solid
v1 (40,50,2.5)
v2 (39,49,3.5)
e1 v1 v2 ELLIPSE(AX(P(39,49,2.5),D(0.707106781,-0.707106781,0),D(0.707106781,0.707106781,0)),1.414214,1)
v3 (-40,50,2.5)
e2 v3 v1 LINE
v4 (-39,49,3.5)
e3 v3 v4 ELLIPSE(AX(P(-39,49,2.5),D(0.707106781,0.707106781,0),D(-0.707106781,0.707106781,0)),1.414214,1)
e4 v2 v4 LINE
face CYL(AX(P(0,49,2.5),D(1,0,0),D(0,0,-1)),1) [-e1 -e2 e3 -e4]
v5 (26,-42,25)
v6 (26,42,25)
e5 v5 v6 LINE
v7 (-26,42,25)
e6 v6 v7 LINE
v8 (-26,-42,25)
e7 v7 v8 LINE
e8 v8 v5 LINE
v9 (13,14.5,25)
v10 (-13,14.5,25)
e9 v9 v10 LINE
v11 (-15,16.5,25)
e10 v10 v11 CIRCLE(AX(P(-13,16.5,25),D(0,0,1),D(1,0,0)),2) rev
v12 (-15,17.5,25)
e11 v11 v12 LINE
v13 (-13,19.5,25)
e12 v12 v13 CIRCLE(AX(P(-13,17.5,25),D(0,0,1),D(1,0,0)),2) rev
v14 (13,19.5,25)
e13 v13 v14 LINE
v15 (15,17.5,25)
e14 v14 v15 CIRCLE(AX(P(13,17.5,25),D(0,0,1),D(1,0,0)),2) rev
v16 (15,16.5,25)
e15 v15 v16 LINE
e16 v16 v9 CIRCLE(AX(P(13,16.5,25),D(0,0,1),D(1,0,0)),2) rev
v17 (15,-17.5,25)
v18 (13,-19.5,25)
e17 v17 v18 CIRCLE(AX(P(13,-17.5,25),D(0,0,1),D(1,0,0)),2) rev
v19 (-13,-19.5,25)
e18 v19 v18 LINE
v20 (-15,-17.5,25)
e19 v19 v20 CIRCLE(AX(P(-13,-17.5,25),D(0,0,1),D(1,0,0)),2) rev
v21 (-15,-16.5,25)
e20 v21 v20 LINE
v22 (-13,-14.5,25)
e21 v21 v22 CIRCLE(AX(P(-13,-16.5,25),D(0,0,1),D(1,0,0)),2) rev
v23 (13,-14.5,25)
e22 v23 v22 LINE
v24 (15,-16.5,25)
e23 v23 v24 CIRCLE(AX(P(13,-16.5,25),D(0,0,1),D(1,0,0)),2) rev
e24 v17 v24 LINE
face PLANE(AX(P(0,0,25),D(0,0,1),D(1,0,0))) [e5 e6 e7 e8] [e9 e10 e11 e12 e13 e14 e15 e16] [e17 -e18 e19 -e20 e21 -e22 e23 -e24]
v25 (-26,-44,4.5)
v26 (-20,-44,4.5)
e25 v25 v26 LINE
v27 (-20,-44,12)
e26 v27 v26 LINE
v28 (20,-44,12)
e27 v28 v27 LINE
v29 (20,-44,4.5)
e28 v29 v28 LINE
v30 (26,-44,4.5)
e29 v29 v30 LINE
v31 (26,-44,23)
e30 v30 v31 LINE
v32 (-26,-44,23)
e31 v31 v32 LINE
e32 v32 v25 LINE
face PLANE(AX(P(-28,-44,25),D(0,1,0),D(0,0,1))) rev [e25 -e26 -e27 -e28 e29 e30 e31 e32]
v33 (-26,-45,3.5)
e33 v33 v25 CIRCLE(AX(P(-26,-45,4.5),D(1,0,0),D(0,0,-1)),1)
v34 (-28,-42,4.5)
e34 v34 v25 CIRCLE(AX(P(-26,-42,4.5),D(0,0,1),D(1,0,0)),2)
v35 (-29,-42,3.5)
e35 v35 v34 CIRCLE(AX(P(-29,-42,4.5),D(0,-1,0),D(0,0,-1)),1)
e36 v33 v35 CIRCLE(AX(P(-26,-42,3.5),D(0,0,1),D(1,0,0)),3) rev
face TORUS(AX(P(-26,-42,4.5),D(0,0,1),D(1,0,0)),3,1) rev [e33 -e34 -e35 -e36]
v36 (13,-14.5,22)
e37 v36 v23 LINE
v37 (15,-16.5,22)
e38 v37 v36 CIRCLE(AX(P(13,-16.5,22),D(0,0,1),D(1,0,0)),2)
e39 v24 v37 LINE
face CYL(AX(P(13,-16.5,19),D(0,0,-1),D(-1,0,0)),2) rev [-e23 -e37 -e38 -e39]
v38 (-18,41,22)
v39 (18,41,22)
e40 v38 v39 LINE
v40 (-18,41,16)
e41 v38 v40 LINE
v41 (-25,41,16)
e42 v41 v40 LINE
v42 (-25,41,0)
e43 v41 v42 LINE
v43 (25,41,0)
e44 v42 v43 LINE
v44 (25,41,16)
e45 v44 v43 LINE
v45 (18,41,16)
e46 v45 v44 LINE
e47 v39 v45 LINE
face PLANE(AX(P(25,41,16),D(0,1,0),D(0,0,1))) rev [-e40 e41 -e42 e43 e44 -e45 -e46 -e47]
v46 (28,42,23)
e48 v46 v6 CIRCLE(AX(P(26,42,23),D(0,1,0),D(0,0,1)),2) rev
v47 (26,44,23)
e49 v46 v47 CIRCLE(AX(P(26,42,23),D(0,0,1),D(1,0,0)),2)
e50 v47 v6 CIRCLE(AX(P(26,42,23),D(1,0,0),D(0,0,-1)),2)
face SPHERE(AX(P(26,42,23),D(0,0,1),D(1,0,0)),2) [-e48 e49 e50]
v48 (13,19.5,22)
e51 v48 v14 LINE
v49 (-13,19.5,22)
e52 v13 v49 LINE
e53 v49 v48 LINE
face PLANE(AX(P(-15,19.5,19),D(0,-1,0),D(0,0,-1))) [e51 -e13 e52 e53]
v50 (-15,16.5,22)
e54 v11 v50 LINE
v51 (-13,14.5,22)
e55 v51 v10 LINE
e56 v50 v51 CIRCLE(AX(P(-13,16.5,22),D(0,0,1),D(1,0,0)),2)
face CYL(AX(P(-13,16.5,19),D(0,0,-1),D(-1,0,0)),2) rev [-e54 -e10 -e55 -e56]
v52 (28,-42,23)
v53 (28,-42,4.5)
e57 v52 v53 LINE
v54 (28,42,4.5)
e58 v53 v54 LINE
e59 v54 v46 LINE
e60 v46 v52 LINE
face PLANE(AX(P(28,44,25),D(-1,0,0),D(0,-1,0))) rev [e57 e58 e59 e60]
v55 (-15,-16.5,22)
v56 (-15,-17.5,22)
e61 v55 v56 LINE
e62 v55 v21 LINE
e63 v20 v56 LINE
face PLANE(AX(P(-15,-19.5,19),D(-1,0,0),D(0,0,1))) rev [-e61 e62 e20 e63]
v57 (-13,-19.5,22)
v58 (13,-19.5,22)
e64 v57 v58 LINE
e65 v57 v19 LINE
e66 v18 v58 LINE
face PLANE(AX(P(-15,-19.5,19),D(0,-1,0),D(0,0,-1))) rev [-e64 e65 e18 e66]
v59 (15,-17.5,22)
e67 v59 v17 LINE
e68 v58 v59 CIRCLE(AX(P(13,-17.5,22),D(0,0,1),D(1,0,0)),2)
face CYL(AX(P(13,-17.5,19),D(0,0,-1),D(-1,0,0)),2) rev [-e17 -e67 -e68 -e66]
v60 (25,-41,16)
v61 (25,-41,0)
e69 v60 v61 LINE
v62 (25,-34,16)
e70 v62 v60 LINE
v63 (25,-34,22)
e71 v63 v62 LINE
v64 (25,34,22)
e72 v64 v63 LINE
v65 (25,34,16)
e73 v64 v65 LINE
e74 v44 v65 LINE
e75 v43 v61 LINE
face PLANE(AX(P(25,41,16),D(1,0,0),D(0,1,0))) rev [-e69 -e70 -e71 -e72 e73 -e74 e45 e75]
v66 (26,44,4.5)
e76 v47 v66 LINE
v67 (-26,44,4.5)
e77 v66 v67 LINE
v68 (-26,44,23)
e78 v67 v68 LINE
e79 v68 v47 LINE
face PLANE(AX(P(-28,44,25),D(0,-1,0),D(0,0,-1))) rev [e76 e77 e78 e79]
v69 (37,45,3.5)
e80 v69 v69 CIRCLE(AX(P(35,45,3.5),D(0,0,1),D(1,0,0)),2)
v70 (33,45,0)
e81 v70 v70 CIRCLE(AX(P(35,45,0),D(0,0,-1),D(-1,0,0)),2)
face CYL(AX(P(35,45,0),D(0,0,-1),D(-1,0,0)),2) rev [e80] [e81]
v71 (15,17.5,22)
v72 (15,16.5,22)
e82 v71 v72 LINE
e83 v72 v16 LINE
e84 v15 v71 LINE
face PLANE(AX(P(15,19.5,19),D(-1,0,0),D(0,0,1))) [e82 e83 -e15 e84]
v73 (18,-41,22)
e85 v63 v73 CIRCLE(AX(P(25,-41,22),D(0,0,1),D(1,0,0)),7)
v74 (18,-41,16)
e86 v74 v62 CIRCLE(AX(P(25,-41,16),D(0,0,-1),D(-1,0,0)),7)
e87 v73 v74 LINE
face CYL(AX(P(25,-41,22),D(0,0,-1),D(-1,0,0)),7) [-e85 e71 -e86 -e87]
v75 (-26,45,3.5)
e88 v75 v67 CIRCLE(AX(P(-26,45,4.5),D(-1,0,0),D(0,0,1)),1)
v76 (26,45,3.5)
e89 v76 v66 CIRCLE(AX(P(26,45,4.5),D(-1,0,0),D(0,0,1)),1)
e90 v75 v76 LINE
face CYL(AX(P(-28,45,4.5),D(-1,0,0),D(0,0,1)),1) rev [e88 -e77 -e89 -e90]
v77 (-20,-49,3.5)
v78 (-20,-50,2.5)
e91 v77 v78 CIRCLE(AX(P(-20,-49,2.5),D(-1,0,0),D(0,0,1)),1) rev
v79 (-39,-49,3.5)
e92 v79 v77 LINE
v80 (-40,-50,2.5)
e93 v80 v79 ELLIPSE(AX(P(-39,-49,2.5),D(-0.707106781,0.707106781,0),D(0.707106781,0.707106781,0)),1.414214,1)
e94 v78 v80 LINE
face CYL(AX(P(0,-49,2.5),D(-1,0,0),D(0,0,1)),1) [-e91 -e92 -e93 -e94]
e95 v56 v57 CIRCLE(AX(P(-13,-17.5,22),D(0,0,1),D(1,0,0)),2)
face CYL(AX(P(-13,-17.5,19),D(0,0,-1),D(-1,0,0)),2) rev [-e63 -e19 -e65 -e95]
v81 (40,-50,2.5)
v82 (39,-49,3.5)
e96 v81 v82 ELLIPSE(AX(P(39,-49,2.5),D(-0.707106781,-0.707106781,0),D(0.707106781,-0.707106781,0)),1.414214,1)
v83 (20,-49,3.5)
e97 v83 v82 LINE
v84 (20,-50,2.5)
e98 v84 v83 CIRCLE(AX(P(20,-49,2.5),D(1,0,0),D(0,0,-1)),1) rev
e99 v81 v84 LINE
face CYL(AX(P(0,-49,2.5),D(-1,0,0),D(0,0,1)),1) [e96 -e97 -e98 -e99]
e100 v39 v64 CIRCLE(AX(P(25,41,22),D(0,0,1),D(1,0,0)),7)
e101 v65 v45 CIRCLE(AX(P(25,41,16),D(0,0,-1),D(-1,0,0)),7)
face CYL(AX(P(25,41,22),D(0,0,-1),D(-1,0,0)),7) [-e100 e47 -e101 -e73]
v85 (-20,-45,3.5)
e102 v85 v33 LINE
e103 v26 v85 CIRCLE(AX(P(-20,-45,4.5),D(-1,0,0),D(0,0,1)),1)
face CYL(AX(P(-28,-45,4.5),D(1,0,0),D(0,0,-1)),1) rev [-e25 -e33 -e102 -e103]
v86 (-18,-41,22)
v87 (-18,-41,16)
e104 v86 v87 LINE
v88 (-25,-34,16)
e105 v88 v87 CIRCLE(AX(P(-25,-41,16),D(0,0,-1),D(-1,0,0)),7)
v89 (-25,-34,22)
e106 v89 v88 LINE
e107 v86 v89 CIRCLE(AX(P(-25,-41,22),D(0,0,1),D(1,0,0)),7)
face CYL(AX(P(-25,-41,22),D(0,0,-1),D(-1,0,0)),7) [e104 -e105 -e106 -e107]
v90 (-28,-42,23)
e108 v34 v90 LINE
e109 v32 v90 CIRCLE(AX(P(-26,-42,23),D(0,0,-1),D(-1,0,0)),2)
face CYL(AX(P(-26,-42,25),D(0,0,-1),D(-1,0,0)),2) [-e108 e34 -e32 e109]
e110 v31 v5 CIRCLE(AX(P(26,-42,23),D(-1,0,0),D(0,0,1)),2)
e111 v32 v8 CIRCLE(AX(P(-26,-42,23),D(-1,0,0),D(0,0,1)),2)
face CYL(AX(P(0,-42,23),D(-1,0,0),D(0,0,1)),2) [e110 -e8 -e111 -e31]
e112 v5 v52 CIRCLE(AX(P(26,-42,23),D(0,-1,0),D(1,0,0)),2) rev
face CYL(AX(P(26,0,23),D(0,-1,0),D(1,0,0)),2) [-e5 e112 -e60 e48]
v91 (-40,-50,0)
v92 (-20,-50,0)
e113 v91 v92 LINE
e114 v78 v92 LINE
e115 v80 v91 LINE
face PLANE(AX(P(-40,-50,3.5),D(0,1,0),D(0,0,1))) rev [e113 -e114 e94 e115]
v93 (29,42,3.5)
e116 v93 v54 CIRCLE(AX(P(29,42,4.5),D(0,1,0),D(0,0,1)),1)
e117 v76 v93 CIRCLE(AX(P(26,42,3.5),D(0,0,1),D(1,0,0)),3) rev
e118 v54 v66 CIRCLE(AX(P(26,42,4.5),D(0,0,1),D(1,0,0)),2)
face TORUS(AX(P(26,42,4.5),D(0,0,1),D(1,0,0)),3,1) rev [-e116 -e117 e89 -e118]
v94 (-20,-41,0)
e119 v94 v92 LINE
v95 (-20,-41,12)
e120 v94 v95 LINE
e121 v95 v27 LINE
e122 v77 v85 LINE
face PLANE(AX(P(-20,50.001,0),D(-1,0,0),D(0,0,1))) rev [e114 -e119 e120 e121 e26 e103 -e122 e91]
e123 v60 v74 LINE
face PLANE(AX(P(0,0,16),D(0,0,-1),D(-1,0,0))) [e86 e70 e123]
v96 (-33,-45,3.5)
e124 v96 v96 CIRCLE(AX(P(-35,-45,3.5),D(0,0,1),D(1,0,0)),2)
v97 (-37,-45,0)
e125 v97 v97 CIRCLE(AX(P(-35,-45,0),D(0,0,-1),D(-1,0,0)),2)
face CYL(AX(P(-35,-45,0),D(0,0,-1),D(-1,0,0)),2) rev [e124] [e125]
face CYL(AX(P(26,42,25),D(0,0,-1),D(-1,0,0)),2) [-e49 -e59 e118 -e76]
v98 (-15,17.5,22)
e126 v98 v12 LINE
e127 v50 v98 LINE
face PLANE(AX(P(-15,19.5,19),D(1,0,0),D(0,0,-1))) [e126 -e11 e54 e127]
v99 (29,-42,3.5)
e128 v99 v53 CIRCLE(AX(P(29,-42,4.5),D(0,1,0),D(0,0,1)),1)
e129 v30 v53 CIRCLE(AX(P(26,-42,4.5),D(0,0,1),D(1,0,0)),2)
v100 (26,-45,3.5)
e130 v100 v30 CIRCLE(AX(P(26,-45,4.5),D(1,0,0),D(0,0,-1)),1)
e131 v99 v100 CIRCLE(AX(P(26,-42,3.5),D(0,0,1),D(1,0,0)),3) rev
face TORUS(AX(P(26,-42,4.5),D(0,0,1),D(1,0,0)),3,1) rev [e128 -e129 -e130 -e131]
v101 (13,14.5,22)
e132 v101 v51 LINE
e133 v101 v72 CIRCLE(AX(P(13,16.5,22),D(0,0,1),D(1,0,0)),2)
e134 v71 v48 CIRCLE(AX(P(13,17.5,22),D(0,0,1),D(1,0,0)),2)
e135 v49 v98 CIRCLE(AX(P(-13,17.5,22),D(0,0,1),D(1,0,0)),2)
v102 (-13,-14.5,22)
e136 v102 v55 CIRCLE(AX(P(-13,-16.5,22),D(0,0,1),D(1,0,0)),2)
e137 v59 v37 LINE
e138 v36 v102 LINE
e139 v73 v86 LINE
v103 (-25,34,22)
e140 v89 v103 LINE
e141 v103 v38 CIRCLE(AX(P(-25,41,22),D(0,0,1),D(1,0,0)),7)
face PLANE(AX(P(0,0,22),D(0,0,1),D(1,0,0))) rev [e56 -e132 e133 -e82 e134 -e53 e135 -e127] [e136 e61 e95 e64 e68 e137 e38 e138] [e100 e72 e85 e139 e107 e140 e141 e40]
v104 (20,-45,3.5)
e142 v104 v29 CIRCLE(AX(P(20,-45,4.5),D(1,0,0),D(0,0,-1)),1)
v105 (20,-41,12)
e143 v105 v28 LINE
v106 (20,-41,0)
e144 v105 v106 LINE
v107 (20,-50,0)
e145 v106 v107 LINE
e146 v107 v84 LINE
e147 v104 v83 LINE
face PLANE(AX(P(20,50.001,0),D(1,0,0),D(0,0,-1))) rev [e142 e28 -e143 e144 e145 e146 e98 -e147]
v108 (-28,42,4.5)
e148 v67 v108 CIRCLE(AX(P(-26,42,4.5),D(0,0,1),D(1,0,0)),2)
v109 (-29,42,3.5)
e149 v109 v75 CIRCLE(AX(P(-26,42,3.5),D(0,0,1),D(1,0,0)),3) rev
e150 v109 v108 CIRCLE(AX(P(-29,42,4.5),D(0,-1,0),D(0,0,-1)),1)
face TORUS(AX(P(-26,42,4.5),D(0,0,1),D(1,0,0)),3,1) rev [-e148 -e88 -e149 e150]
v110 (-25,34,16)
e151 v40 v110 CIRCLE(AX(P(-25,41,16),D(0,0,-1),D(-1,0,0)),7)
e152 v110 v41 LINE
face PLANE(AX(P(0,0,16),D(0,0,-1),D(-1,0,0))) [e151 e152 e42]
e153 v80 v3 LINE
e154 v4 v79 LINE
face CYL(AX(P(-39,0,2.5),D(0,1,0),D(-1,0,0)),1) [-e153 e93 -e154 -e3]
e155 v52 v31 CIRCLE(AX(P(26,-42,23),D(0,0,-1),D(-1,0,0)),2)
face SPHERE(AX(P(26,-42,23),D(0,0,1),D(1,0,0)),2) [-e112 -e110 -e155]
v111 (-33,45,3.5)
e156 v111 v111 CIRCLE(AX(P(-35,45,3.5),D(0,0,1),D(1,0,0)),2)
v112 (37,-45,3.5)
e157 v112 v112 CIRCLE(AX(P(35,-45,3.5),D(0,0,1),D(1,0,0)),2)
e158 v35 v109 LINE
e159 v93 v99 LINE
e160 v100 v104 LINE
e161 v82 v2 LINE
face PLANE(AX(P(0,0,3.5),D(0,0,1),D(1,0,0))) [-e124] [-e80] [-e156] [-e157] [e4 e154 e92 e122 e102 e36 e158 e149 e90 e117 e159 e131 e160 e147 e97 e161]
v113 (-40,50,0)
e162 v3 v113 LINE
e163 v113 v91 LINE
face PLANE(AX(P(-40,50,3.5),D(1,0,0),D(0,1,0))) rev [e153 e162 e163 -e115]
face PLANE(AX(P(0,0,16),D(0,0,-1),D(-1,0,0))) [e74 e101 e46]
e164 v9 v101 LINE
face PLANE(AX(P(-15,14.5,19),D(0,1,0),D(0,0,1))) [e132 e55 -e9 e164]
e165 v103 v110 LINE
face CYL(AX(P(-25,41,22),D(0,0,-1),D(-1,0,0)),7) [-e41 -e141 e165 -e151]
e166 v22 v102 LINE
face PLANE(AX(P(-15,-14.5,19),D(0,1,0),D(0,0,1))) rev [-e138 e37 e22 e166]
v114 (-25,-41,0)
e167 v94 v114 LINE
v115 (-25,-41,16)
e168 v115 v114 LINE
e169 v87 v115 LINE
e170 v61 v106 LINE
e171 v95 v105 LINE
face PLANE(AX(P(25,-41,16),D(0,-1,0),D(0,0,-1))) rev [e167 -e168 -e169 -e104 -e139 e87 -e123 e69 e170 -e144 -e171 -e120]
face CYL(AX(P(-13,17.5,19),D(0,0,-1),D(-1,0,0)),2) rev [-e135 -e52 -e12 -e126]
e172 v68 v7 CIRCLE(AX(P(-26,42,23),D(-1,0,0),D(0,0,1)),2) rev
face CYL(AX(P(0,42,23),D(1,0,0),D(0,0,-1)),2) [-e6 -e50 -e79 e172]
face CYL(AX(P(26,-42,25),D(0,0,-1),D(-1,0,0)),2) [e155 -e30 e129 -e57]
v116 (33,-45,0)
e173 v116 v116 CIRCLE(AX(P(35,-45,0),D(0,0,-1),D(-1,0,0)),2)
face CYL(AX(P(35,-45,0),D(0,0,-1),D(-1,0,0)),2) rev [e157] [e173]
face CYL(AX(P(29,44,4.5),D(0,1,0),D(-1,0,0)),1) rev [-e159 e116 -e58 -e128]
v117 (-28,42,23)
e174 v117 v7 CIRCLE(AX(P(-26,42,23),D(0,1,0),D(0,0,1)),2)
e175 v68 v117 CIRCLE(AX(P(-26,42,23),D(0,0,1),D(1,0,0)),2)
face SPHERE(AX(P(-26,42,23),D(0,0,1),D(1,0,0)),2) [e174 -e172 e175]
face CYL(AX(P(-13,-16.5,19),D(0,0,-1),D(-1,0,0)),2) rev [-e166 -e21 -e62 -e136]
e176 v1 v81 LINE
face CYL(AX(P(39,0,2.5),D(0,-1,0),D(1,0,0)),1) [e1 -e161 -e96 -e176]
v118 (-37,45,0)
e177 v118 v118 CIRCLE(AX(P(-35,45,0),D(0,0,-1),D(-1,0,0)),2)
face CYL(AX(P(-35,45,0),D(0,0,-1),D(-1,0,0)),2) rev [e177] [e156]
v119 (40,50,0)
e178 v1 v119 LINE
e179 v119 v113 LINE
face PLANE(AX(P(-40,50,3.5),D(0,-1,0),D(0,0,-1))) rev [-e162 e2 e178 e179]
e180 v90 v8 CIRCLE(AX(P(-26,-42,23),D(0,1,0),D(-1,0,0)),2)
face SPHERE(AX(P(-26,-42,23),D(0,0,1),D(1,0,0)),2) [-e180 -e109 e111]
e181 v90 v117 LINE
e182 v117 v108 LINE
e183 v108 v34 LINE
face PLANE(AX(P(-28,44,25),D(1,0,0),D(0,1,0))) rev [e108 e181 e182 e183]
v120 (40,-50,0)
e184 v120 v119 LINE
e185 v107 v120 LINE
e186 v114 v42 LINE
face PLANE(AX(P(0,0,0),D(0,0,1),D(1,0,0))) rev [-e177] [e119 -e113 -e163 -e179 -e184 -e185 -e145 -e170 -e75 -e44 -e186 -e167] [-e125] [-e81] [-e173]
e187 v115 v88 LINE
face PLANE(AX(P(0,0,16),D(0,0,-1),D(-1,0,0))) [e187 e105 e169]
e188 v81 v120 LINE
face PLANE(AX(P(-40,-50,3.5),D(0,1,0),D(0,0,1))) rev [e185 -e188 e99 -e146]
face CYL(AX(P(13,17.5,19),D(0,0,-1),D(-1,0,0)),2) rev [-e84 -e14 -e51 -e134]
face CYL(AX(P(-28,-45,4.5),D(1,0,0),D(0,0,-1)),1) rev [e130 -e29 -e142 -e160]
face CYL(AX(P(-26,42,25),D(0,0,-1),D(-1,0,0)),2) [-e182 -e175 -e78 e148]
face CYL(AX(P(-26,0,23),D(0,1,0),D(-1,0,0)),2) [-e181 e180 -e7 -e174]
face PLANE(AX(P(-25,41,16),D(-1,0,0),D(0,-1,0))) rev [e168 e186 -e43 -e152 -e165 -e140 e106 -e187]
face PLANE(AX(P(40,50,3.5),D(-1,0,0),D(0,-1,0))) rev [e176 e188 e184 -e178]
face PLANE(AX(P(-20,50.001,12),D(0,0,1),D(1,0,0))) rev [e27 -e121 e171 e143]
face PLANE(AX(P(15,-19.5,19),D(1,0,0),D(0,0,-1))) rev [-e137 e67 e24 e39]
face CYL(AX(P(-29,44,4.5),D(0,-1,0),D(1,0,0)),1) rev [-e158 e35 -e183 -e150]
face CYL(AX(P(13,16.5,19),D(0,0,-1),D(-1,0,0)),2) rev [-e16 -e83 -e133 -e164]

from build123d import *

# Parameters (mm, degrees)
SKETCH1_W             = 80
SKETCH1_H             = 100
BOSS_EXTRUDE1_DEPTH   = 3.5
SKETCH3_W             = 56
SKETCH3_H             = 88
BOSS_EXTRUDE2_DEPTH   = 21.5
SKETCH4_W             = 50
SKETCH4_H             = 82
CUT_EXTRUDE4_DEPTH    = 16
CUT_EXTRUDE5_DEPTH    = 6
SKETCH8_W             = 30
SKETCH8_H             = 5
CUT_EXTRUDE6_DEPTH    = 6
CUT_EXTRUDE7_REACH    = 112.567
SKETCH9_W             = 40
SKETCH9_H             = 12
F_4_0MM_DOWEL_HOLE1_D = 4
FILLET1_R             = 7
FILLET2_R             = 2
FILLET3_R             = 1
FILLET4_R             = 2


# Some blends are built 0.0001 mm under size
with BuildPart() as part:
    # Sketch1 → Boss-Extrude1 (new body)
    with BuildSketch(Plane.XY):
        Rectangle(SKETCH1_W, SKETCH1_H)
    extrude(amount=BOSS_EXTRUDE1_DEPTH)

    # Sketch3 → Boss-Extrude2 (add)
    with BuildSketch(Plane.XY.offset(3.5)):
        Rectangle(SKETCH3_W, SKETCH3_H)
    extrude(amount=BOSS_EXTRUDE2_DEPTH)

    # Sketch4 → Cut-Extrude4 (cut)
    with BuildSketch(Plane(origin=(0, 0, 0), x_dir=(-1, 0, 0), z_dir=(0, 0, -1))):
        Rectangle(SKETCH4_W, SKETCH4_H)
    extrude(amount=-CUT_EXTRUDE4_DEPTH, mode=Mode.SUBTRACT)

    # Sketch7 → Cut-Extrude5 (cut)
    with BuildSketch(Plane(origin=(0, 0, 16), x_dir=(-1, 0, 0), z_dir=(0, 0, -1))):
        Polygon((-18, 41), (18, 41), (18, 34), (25, 34), (25, -34), (18, -34), (18, -41), (-18, -41), (-18, -34), (-25, -34), (-25, 34), (-18, 34), align=None)
    extrude(amount=-CUT_EXTRUDE5_DEPTH, mode=Mode.SUBTRACT)

    # Sketch8 → Cut-Extrude6 (cut)
    with BuildSketch(Plane.XY.offset(25)):
        with Locations((0, -17)):
            Rectangle(SKETCH8_W, SKETCH8_H)
    cut_extrude6 = extrude(amount=-CUT_EXTRUDE6_DEPTH, mode=Mode.SUBTRACT)

    # Mirror1: Cut-Extrude6 across plane
    add(cut_extrude6.mirror(Plane.ZX), mode=Mode.SUBTRACT)

    # Sketch9 → Cut-Extrude7 (cut, up to next)
    with BuildSketch(Plane.XZ.offset(50), mode=Mode.PRIVATE) as cut_extrude7_sk1:
        with Locations((0, 6)):
            Rectangle(SKETCH9_W, SKETCH9_H)
    cut_extrude7_tool1 = extrude(cut_extrude7_sk1.sketch, amount=-CUT_EXTRUDE7_REACH, mode=Mode.PRIVATE) & part.part
    add(cut_extrude7_tool1.solids().sort_by_distance((0, -50, 6))[0], mode=Mode.SUBTRACT)

    # Ø4.0mm Dowel Hole1 (through all)
    with Locations(Plane(origin=(0, 0, 0), x_dir=(-1, 0, 0), z_dir=(0, 0, -1))):
        with Locations((-35, 45), (35, 45), (35, -45), (-35, -45)):
            Hole(F_4_0MM_DOWEL_HOLE1_D / 2)

    # Fillet1
    fillet1_edges = [part.edges().sort_by_distance(p)[0] for p in [
        (-18, 34, 19),
        (18, 34, 19),
        (18, -34, 19),
        (-18, -34, 19),
    ]]
    fillet(fillet1_edges, radius=FILLET1_R - 0.0001)  # a hair under: the kernel refuses the full size

    # Fillet2
    fillet2_edges = [part.edges().sort_by_distance(p)[0] for p in [
        (28, -44, 14.25),
        (28, 44, 14.25),
        (-28, 44, 14.25),
        (-28, -44, 14.25),
        (28, 0, 25),
        (0, 44, 25),
        (-28, 0, 25),
        (15, -14.5, 23.5),
        (15, -19.5, 23.5),
        (-15, -19.5, 23.5),
        (-15, -14.5, 23.5),
        (15, 19.5, 23.5),
        (15, 14.5, 23.5),
        (-15, 14.5, 23.5),
        (-15, 19.5, 23.5),
    ]]
    fillet(fillet2_edges, radius=FILLET2_R)

    # Fillet3
    fillet3_edges = [part.edges().sort_by_distance(p)[0] for p in [
        (-40, 0, 3.5),
        (23, -44, 3.5),
        (30, -50, 3.5),
        (-30, -50, 3.5),
        (28, 0, 3.5),
        (-23, -44, 3.5),
        (-28, 0, 3.5),
        (0, 44, 3.5),
        (27.414213562, -43.414213562, 3.5),
        (-27.414213562, -43.414213562, 3.5),
        (-27.414213562, 43.414213562, 3.5),
        (27.414213562, 43.414213562, 3.5),
        (40, 0, 3.5),
        (0, 50, 3.5),
    ]]
    fillet(fillet3_edges, radius=FILLET3_R)

    # Fillet4
    # the kernel refuses this fillet: 2 mm, written as the material it takes off along each edge
    with BuildSketch(Plane(origin=(-26, -42, 23), x_dir=(0, 0, 1), z_dir=(0, -1, 0))) as fillet4_piece_1_section:
        Polygon((0, 0), (FILLET4_R, 0), (FILLET4_R, FILLET4_R), (0, FILLET4_R), align=None)
    fillet4_piece_1 = extrude(amount=FILLET4_R, mode=Mode.PRIVATE)
    fillet4_piece_1 = fillet4_piece_1 - Plane(origin=(-26, -42, 23), x_dir=(0.7071067811865475, 0, -0.7071067811865475), z_dir=(0, -1, 0)) * Sphere(FILLET4_R, mode=Mode.PRIVATE)
    add(fillet4_piece_1, mode=Mode.SUBTRACT)
    with BuildSketch(Plane(origin=(26, -42, 23), x_dir=(0, 0, 1), z_dir=(0, -1, 0))) as fillet4_piece_2_section:
        Polygon((0, 0), (FILLET4_R, 0), (FILLET4_R, -FILLET4_R), (0, -FILLET4_R), align=None)
    fillet4_piece_2 = extrude(amount=FILLET4_R, mode=Mode.PRIVATE)
    fillet4_piece_2 = fillet4_piece_2 - Plane(origin=(26, -42, 23), x_dir=(-0.7071067811865475, 0, -0.7071067811865475), z_dir=(0, -1, 0)) * Sphere(FILLET4_R, mode=Mode.PRIVATE)
    add(fillet4_piece_2, mode=Mode.SUBTRACT)
    with BuildSketch(Plane(origin=(26, -44, 25), x_dir=(0, 0, -1), z_dir=(-1, 0, 0))) as fillet4_piece_3:
        with BuildLine():
            CenterArc((FILLET4_R, -FILLET4_R), FILLET4_R, 90, 90)
            Line((0, -FILLET4_R), (0, 0))
            Line((0, 0), (FILLET4_R, 0))
        make_face()
    extrude(amount=52, mode=Mode.SUBTRACT)


solid = part.part
